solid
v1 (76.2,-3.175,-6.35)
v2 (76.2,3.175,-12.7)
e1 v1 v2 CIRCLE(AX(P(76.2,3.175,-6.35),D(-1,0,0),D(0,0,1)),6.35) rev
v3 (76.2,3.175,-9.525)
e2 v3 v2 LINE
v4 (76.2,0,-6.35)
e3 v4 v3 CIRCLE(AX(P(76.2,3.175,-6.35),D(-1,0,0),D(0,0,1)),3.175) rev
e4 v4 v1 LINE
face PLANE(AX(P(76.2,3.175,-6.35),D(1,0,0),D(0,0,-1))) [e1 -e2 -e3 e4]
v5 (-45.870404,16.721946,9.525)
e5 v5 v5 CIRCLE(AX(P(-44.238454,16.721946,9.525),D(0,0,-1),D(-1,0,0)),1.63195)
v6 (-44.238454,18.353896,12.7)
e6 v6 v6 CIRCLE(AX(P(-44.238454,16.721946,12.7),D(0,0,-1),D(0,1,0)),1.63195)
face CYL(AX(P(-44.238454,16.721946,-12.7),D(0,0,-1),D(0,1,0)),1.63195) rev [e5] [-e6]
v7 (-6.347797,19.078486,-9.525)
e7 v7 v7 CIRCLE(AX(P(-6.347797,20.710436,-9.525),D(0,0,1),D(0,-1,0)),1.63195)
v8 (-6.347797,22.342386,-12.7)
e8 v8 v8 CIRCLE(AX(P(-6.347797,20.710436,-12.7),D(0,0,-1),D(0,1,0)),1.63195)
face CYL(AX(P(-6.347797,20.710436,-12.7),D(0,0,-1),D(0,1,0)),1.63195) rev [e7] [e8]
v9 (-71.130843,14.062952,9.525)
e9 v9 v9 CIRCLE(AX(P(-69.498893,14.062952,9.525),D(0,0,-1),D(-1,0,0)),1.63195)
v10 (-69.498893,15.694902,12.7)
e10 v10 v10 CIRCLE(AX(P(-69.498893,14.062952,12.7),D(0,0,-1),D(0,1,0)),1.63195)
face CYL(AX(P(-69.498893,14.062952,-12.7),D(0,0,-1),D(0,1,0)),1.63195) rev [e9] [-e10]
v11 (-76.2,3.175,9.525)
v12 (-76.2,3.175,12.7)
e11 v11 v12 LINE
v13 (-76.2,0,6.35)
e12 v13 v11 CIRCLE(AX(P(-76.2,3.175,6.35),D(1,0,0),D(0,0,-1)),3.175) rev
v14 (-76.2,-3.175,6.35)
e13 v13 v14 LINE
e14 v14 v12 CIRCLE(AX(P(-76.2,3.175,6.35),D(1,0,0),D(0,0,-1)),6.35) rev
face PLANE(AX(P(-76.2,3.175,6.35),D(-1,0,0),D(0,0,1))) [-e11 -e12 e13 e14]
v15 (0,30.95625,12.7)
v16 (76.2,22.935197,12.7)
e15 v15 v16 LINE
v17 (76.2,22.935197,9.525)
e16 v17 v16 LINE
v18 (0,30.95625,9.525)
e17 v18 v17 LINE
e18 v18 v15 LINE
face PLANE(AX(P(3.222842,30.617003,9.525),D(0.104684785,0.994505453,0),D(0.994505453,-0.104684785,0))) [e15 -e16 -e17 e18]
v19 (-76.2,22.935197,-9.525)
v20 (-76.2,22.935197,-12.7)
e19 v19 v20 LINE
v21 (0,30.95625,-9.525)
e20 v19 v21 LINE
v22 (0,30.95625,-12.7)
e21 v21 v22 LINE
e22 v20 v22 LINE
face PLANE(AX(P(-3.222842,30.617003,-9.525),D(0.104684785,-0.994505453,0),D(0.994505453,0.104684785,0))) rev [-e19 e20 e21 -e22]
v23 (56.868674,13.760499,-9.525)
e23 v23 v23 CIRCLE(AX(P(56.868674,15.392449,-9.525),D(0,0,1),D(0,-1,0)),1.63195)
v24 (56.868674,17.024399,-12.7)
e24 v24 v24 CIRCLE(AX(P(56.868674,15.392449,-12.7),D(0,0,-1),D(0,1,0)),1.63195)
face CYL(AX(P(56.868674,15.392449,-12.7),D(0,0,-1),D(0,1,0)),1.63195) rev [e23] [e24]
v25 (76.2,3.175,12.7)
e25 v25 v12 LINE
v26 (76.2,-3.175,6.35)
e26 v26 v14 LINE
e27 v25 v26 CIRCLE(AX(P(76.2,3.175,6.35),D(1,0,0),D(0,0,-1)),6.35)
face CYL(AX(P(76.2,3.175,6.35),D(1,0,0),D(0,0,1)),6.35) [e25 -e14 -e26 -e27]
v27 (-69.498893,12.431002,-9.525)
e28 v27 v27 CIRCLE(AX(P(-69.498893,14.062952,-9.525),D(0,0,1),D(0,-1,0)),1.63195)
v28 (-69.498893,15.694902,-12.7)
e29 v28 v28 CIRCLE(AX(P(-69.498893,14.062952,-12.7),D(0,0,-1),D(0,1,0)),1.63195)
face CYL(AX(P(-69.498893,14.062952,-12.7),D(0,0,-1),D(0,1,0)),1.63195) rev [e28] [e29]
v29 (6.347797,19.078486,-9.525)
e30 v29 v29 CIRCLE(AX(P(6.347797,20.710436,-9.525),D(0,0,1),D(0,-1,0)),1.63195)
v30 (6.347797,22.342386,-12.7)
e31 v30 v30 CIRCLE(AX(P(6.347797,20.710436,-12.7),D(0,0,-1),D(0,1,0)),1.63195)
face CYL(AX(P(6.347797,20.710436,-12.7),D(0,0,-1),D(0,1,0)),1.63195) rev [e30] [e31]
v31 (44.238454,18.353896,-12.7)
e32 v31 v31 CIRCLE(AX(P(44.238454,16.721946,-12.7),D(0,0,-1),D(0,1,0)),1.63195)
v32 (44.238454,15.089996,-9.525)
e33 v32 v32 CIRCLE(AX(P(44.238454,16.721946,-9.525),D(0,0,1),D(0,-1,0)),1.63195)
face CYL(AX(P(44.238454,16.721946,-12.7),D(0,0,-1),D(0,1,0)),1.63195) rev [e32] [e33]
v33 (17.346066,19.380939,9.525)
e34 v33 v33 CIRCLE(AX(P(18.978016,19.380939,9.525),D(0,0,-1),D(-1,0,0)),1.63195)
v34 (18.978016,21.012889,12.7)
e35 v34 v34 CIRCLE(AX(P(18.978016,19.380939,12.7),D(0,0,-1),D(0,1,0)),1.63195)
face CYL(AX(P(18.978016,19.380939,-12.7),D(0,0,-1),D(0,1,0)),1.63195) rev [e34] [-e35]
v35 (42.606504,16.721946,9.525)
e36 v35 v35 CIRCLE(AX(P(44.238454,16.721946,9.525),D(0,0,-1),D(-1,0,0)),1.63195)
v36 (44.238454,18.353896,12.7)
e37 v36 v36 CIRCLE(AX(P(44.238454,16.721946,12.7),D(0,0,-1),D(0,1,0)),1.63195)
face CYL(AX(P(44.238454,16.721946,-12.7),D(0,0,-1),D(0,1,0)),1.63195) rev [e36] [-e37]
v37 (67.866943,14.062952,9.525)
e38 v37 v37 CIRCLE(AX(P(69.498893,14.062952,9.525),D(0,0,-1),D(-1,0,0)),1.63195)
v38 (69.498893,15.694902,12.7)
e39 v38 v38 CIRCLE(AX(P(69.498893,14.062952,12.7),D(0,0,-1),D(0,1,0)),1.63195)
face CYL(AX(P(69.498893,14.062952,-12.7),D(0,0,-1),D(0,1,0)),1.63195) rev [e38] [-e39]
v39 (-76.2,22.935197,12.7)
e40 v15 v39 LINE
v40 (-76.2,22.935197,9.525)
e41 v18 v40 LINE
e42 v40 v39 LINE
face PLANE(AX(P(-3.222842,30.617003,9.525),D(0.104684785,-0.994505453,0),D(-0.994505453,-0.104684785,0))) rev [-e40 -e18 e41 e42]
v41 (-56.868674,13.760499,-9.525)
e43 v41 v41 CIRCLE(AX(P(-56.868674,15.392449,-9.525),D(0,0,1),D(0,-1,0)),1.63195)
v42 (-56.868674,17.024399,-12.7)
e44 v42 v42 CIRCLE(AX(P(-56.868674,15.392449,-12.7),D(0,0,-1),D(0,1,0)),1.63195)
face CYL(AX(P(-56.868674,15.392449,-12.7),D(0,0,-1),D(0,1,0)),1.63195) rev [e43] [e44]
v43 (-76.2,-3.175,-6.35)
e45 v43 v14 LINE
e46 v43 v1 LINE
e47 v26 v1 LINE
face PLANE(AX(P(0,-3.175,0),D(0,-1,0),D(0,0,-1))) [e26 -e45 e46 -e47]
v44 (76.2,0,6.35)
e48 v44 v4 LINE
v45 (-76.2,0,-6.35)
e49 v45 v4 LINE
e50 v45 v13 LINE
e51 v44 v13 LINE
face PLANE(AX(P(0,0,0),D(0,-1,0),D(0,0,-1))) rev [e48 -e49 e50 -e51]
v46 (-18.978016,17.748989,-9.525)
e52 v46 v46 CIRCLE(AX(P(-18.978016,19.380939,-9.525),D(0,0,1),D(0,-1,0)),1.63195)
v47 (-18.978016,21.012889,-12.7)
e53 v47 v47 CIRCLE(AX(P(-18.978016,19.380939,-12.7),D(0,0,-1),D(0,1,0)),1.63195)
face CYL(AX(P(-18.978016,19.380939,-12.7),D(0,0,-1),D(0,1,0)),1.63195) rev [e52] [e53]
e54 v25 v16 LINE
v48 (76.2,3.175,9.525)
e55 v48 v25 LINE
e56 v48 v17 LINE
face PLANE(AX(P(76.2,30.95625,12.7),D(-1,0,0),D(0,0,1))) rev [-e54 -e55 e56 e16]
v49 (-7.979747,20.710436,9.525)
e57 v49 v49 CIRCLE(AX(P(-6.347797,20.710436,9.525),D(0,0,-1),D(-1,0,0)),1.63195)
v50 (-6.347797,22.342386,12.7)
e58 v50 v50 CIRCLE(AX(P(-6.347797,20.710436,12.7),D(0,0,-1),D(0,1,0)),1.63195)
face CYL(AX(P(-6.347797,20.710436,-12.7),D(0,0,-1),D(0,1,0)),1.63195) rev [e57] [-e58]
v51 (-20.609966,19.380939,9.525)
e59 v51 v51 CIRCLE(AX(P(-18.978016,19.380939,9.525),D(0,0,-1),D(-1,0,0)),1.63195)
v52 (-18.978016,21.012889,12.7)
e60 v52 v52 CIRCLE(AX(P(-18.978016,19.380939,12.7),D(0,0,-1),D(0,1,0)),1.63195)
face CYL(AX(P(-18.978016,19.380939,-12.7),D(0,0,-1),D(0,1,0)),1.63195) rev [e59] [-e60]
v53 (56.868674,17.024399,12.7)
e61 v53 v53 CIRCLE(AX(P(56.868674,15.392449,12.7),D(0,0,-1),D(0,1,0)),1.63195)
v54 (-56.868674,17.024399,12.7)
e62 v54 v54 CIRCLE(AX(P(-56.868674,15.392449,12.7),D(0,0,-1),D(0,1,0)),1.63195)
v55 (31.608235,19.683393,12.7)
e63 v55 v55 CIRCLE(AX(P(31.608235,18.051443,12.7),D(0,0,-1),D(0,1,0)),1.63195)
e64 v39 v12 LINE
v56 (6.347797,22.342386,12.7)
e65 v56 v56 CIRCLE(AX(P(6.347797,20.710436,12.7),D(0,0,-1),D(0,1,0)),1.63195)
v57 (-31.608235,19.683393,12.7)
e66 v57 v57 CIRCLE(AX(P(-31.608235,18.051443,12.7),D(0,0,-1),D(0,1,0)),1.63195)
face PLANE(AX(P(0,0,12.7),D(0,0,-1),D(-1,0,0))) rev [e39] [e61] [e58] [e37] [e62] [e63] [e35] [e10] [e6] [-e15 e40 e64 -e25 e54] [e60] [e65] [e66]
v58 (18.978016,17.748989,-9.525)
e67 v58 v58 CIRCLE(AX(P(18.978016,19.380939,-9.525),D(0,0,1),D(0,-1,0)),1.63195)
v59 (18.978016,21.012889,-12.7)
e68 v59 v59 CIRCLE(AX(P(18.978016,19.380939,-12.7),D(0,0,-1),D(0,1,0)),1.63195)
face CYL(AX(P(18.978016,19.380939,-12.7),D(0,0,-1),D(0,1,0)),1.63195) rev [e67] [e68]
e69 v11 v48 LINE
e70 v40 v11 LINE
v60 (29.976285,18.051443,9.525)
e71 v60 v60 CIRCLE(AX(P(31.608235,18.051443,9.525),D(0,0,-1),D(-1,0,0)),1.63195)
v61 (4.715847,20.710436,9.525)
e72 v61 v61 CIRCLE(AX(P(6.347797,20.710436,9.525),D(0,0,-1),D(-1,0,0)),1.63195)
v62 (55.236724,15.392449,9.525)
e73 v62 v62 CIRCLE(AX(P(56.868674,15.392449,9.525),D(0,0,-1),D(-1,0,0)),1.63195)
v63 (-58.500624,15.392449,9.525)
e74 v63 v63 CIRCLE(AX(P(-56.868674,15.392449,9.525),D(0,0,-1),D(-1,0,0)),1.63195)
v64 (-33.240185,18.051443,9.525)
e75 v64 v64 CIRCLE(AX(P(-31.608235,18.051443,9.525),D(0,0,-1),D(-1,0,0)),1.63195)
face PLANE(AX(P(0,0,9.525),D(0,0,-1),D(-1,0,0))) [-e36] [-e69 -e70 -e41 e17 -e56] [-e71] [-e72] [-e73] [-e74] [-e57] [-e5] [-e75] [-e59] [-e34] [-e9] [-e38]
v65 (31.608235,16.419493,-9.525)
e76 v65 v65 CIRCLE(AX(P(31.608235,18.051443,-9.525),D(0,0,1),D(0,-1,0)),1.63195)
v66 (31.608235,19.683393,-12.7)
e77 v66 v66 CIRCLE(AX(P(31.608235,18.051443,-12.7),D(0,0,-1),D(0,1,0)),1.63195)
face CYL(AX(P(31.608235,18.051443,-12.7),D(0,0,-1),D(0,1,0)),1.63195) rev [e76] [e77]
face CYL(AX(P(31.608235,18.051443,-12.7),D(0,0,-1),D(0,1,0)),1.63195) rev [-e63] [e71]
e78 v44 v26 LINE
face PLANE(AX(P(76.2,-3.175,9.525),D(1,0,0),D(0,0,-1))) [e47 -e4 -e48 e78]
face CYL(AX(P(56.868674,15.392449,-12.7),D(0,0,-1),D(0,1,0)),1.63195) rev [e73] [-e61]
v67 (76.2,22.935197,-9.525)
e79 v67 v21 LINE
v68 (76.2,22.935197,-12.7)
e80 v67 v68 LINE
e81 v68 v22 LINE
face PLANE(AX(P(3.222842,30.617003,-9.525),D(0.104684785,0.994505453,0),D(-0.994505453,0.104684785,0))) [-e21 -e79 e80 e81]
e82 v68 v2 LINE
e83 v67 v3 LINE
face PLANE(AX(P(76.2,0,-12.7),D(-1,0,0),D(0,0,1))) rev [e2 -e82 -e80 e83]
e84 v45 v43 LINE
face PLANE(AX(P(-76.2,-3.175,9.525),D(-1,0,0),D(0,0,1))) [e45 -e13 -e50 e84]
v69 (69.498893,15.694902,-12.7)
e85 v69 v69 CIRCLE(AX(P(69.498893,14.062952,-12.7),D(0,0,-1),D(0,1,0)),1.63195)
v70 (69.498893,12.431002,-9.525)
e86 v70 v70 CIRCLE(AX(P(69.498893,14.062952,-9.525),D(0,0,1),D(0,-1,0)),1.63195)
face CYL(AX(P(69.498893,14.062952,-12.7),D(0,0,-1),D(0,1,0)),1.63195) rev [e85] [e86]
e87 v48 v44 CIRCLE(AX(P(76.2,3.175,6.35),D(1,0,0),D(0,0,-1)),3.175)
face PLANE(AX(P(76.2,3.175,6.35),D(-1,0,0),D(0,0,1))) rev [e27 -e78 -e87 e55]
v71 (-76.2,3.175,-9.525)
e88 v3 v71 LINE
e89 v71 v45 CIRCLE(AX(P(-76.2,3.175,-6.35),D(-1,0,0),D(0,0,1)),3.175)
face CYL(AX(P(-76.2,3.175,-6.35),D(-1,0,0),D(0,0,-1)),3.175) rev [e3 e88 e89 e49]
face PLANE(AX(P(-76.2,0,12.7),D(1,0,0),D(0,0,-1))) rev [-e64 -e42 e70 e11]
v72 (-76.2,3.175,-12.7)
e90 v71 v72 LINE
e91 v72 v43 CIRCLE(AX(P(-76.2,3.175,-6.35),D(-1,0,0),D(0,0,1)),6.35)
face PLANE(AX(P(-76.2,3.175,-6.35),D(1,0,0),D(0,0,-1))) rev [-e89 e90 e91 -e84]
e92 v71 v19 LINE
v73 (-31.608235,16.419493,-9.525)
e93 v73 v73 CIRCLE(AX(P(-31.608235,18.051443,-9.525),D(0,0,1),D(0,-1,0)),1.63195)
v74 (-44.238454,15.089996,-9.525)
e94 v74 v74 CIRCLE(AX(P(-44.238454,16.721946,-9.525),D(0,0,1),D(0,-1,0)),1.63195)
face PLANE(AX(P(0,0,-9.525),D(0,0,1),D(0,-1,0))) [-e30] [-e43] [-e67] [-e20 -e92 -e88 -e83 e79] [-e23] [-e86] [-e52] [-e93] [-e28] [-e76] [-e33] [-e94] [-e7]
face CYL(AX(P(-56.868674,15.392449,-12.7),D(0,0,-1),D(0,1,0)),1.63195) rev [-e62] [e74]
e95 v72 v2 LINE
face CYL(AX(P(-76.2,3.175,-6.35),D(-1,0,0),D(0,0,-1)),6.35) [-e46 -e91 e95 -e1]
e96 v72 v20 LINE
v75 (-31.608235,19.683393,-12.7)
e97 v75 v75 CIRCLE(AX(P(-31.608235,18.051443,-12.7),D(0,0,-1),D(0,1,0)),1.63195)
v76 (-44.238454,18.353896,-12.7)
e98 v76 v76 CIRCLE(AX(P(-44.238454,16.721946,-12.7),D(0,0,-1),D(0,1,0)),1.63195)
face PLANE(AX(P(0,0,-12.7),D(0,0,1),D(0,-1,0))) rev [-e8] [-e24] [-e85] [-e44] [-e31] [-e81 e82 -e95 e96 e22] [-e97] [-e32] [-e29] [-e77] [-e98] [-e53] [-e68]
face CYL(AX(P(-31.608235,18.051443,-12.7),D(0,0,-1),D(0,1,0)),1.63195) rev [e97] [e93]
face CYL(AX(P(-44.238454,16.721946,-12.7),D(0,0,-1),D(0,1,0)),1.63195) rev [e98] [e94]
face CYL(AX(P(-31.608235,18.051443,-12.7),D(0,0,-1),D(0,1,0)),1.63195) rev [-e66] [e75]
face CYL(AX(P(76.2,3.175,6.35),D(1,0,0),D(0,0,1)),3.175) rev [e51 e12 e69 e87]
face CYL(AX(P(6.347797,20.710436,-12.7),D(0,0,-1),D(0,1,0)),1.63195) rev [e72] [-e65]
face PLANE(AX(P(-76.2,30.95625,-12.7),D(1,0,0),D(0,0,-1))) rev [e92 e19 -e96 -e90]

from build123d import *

# Parameters (mm, degrees)
SKETCH1_W                      = 152.4
SKETCH1_H                      = 19.05
BASE_FLANGE1_DEPTH             = 3.175
EDGE_FLANGE1_STRIP_W           = 19.05
EDGE_FLANGE1_STRIP_H           = 3.175
EDGE_FLANGE1_STRIP_CUT_DEPTH   = 152.4
EDGE_FLANGE1_STRIP_2_W         = 19.05
EDGE_FLANGE1_STRIP_2_H         = 3.175
EDGE_FLANGE1_STRIP_CUT_2_DEPTH = 152.4
EDGE_FLANGE1_DEPTH             = 152.4
EDGE_FLANGE1_BEND_DEPTH        = 152.4
CUT_EXTRUDE1_DEPTH             = 87.08071453
F_30_0_1285_DIAMETER_HOLE1_D   = 3.2639


# Sheet-metal steps are written as plain solids
with BuildPart() as part:
    # Sketch1 → Base-Flange1 (new body)
    with BuildSketch(Plane(origin=(0, 0, 0), x_dir=(1, 0, 0), z_dir=(0, 1, 0))):
        Rectangle(SKETCH1_W, SKETCH1_H)
    extrude(amount=-BASE_FLANGE1_DEPTH)

    # Edge-Flange1 strip (across the edge) → Edge-Flange1 strip cut (cut)
    with BuildSketch(Plane(origin=(-76.2, 0, 9.525), x_dir=(0, 0, -1), z_dir=(1, 0, 0))):
        with Locations((-6.35, -1.5875)):
            Rectangle(EDGE_FLANGE1_STRIP_W, EDGE_FLANGE1_STRIP_H)
    extrude(amount=EDGE_FLANGE1_STRIP_CUT_DEPTH, mode=Mode.SUBTRACT)

    # Edge-Flange1 strip 2 (across the edge) → Edge-Flange1 strip cut 2 (cut)
    with BuildSketch(Plane(origin=(76.2, 0, -9.525), x_dir=(0, 0, 1), z_dir=(-1, 0, 0))):
        with Locations((-6.35, -1.5875)):
            Rectangle(EDGE_FLANGE1_STRIP_2_W, EDGE_FLANGE1_STRIP_2_H)
    extrude(amount=EDGE_FLANGE1_STRIP_CUT_2_DEPTH, mode=Mode.SUBTRACT)

    # Edge-Flange1 section (across the edge) → Edge-Flange1 (add)
    with BuildSketch(Plane(origin=(-76.2, 0, 9.525), x_dir=(0, 0, -1), z_dir=(1, 0, 0))):
        with BuildLine():
            Line((-3.175, 3.175), (-3.175, 30.95625))
            Line((-3.175, 30.95625), (0, 30.95625))
            Line((0, 30.95625), (0, 3.175))
            ThreePointArc((0, 3.175), (0.92993597, 0.92993597), (3.175, 0))
            Line((3.175, 0), (3.175, -3.175))
            ThreePointArc((3.175, -3.175), (-1.315128061, -1.315128061), (-3.175, 3.175))
        make_face()
    extrude(amount=EDGE_FLANGE1_DEPTH)

    # Edge-Flange1 section 2 (across the edge) → Edge-Flange1 bend (add)
    with BuildSketch(Plane(origin=(76.2, 0, -9.525), x_dir=(0, 0, 1), z_dir=(-1, 0, 0))):
        with BuildLine():
            Line((-3.175, 3.175), (-3.175, 30.95625))
            Line((-3.175, 30.95625), (0, 30.95625))
            Line((0, 30.95625), (0, 3.175))
            ThreePointArc((0, 3.175), (0.92993597, 0.92993597), (3.175, 0))
            Line((3.175, 0), (3.175, -3.175))
            ThreePointArc((3.175, -3.175), (-1.315128061, -1.315128061), (-3.175, 3.175))
        make_face()
    extrude(amount=EDGE_FLANGE1_BEND_DEPTH)

    # Sketch12 → Cut-Extrude1 (cut, through all)
    with BuildSketch(Plane(origin=(0, 0, -12.7), x_dir=(-1, 0, 0), z_dir=(0, 0, -1))):
        Polygon((76.2, 30.95625), (0, 30.95625), (76.2, 22.935197368), align=None)
        Polygon((-76.2, 22.935197368), (0, 30.95625), (-76.2, 30.95625), align=None)
    extrude(amount=-CUT_EXTRUDE1_DEPTH, mode=Mode.SUBTRACT)

    # #30 (0.1285) Diameter Hole1 (through all)
    with Locations(Plane(origin=(0, 0, -12.7), x_dir=(-1, 0, 0), z_dir=(0, 0, -1))):
        with Locations((-69.498892921, 14.062952351), (-56.868673669, 15.392449114), (-44.238454417, 16.721945878), (-31.608235165, 18.051442641), (-18.978015912, 19.380939405), (-6.34779666, 20.710436168), (6.34779666, 20.710436168), (18.978015912, 19.380939405), (31.608235165, 18.051442641), (44.238454417, 16.721945878), (56.868673669, 15.392449114), (69.498892921, 14.062952351)):
            Hole(F_30_0_1285_DIAMETER_HOLE1_D / 2)


solid = part.part
